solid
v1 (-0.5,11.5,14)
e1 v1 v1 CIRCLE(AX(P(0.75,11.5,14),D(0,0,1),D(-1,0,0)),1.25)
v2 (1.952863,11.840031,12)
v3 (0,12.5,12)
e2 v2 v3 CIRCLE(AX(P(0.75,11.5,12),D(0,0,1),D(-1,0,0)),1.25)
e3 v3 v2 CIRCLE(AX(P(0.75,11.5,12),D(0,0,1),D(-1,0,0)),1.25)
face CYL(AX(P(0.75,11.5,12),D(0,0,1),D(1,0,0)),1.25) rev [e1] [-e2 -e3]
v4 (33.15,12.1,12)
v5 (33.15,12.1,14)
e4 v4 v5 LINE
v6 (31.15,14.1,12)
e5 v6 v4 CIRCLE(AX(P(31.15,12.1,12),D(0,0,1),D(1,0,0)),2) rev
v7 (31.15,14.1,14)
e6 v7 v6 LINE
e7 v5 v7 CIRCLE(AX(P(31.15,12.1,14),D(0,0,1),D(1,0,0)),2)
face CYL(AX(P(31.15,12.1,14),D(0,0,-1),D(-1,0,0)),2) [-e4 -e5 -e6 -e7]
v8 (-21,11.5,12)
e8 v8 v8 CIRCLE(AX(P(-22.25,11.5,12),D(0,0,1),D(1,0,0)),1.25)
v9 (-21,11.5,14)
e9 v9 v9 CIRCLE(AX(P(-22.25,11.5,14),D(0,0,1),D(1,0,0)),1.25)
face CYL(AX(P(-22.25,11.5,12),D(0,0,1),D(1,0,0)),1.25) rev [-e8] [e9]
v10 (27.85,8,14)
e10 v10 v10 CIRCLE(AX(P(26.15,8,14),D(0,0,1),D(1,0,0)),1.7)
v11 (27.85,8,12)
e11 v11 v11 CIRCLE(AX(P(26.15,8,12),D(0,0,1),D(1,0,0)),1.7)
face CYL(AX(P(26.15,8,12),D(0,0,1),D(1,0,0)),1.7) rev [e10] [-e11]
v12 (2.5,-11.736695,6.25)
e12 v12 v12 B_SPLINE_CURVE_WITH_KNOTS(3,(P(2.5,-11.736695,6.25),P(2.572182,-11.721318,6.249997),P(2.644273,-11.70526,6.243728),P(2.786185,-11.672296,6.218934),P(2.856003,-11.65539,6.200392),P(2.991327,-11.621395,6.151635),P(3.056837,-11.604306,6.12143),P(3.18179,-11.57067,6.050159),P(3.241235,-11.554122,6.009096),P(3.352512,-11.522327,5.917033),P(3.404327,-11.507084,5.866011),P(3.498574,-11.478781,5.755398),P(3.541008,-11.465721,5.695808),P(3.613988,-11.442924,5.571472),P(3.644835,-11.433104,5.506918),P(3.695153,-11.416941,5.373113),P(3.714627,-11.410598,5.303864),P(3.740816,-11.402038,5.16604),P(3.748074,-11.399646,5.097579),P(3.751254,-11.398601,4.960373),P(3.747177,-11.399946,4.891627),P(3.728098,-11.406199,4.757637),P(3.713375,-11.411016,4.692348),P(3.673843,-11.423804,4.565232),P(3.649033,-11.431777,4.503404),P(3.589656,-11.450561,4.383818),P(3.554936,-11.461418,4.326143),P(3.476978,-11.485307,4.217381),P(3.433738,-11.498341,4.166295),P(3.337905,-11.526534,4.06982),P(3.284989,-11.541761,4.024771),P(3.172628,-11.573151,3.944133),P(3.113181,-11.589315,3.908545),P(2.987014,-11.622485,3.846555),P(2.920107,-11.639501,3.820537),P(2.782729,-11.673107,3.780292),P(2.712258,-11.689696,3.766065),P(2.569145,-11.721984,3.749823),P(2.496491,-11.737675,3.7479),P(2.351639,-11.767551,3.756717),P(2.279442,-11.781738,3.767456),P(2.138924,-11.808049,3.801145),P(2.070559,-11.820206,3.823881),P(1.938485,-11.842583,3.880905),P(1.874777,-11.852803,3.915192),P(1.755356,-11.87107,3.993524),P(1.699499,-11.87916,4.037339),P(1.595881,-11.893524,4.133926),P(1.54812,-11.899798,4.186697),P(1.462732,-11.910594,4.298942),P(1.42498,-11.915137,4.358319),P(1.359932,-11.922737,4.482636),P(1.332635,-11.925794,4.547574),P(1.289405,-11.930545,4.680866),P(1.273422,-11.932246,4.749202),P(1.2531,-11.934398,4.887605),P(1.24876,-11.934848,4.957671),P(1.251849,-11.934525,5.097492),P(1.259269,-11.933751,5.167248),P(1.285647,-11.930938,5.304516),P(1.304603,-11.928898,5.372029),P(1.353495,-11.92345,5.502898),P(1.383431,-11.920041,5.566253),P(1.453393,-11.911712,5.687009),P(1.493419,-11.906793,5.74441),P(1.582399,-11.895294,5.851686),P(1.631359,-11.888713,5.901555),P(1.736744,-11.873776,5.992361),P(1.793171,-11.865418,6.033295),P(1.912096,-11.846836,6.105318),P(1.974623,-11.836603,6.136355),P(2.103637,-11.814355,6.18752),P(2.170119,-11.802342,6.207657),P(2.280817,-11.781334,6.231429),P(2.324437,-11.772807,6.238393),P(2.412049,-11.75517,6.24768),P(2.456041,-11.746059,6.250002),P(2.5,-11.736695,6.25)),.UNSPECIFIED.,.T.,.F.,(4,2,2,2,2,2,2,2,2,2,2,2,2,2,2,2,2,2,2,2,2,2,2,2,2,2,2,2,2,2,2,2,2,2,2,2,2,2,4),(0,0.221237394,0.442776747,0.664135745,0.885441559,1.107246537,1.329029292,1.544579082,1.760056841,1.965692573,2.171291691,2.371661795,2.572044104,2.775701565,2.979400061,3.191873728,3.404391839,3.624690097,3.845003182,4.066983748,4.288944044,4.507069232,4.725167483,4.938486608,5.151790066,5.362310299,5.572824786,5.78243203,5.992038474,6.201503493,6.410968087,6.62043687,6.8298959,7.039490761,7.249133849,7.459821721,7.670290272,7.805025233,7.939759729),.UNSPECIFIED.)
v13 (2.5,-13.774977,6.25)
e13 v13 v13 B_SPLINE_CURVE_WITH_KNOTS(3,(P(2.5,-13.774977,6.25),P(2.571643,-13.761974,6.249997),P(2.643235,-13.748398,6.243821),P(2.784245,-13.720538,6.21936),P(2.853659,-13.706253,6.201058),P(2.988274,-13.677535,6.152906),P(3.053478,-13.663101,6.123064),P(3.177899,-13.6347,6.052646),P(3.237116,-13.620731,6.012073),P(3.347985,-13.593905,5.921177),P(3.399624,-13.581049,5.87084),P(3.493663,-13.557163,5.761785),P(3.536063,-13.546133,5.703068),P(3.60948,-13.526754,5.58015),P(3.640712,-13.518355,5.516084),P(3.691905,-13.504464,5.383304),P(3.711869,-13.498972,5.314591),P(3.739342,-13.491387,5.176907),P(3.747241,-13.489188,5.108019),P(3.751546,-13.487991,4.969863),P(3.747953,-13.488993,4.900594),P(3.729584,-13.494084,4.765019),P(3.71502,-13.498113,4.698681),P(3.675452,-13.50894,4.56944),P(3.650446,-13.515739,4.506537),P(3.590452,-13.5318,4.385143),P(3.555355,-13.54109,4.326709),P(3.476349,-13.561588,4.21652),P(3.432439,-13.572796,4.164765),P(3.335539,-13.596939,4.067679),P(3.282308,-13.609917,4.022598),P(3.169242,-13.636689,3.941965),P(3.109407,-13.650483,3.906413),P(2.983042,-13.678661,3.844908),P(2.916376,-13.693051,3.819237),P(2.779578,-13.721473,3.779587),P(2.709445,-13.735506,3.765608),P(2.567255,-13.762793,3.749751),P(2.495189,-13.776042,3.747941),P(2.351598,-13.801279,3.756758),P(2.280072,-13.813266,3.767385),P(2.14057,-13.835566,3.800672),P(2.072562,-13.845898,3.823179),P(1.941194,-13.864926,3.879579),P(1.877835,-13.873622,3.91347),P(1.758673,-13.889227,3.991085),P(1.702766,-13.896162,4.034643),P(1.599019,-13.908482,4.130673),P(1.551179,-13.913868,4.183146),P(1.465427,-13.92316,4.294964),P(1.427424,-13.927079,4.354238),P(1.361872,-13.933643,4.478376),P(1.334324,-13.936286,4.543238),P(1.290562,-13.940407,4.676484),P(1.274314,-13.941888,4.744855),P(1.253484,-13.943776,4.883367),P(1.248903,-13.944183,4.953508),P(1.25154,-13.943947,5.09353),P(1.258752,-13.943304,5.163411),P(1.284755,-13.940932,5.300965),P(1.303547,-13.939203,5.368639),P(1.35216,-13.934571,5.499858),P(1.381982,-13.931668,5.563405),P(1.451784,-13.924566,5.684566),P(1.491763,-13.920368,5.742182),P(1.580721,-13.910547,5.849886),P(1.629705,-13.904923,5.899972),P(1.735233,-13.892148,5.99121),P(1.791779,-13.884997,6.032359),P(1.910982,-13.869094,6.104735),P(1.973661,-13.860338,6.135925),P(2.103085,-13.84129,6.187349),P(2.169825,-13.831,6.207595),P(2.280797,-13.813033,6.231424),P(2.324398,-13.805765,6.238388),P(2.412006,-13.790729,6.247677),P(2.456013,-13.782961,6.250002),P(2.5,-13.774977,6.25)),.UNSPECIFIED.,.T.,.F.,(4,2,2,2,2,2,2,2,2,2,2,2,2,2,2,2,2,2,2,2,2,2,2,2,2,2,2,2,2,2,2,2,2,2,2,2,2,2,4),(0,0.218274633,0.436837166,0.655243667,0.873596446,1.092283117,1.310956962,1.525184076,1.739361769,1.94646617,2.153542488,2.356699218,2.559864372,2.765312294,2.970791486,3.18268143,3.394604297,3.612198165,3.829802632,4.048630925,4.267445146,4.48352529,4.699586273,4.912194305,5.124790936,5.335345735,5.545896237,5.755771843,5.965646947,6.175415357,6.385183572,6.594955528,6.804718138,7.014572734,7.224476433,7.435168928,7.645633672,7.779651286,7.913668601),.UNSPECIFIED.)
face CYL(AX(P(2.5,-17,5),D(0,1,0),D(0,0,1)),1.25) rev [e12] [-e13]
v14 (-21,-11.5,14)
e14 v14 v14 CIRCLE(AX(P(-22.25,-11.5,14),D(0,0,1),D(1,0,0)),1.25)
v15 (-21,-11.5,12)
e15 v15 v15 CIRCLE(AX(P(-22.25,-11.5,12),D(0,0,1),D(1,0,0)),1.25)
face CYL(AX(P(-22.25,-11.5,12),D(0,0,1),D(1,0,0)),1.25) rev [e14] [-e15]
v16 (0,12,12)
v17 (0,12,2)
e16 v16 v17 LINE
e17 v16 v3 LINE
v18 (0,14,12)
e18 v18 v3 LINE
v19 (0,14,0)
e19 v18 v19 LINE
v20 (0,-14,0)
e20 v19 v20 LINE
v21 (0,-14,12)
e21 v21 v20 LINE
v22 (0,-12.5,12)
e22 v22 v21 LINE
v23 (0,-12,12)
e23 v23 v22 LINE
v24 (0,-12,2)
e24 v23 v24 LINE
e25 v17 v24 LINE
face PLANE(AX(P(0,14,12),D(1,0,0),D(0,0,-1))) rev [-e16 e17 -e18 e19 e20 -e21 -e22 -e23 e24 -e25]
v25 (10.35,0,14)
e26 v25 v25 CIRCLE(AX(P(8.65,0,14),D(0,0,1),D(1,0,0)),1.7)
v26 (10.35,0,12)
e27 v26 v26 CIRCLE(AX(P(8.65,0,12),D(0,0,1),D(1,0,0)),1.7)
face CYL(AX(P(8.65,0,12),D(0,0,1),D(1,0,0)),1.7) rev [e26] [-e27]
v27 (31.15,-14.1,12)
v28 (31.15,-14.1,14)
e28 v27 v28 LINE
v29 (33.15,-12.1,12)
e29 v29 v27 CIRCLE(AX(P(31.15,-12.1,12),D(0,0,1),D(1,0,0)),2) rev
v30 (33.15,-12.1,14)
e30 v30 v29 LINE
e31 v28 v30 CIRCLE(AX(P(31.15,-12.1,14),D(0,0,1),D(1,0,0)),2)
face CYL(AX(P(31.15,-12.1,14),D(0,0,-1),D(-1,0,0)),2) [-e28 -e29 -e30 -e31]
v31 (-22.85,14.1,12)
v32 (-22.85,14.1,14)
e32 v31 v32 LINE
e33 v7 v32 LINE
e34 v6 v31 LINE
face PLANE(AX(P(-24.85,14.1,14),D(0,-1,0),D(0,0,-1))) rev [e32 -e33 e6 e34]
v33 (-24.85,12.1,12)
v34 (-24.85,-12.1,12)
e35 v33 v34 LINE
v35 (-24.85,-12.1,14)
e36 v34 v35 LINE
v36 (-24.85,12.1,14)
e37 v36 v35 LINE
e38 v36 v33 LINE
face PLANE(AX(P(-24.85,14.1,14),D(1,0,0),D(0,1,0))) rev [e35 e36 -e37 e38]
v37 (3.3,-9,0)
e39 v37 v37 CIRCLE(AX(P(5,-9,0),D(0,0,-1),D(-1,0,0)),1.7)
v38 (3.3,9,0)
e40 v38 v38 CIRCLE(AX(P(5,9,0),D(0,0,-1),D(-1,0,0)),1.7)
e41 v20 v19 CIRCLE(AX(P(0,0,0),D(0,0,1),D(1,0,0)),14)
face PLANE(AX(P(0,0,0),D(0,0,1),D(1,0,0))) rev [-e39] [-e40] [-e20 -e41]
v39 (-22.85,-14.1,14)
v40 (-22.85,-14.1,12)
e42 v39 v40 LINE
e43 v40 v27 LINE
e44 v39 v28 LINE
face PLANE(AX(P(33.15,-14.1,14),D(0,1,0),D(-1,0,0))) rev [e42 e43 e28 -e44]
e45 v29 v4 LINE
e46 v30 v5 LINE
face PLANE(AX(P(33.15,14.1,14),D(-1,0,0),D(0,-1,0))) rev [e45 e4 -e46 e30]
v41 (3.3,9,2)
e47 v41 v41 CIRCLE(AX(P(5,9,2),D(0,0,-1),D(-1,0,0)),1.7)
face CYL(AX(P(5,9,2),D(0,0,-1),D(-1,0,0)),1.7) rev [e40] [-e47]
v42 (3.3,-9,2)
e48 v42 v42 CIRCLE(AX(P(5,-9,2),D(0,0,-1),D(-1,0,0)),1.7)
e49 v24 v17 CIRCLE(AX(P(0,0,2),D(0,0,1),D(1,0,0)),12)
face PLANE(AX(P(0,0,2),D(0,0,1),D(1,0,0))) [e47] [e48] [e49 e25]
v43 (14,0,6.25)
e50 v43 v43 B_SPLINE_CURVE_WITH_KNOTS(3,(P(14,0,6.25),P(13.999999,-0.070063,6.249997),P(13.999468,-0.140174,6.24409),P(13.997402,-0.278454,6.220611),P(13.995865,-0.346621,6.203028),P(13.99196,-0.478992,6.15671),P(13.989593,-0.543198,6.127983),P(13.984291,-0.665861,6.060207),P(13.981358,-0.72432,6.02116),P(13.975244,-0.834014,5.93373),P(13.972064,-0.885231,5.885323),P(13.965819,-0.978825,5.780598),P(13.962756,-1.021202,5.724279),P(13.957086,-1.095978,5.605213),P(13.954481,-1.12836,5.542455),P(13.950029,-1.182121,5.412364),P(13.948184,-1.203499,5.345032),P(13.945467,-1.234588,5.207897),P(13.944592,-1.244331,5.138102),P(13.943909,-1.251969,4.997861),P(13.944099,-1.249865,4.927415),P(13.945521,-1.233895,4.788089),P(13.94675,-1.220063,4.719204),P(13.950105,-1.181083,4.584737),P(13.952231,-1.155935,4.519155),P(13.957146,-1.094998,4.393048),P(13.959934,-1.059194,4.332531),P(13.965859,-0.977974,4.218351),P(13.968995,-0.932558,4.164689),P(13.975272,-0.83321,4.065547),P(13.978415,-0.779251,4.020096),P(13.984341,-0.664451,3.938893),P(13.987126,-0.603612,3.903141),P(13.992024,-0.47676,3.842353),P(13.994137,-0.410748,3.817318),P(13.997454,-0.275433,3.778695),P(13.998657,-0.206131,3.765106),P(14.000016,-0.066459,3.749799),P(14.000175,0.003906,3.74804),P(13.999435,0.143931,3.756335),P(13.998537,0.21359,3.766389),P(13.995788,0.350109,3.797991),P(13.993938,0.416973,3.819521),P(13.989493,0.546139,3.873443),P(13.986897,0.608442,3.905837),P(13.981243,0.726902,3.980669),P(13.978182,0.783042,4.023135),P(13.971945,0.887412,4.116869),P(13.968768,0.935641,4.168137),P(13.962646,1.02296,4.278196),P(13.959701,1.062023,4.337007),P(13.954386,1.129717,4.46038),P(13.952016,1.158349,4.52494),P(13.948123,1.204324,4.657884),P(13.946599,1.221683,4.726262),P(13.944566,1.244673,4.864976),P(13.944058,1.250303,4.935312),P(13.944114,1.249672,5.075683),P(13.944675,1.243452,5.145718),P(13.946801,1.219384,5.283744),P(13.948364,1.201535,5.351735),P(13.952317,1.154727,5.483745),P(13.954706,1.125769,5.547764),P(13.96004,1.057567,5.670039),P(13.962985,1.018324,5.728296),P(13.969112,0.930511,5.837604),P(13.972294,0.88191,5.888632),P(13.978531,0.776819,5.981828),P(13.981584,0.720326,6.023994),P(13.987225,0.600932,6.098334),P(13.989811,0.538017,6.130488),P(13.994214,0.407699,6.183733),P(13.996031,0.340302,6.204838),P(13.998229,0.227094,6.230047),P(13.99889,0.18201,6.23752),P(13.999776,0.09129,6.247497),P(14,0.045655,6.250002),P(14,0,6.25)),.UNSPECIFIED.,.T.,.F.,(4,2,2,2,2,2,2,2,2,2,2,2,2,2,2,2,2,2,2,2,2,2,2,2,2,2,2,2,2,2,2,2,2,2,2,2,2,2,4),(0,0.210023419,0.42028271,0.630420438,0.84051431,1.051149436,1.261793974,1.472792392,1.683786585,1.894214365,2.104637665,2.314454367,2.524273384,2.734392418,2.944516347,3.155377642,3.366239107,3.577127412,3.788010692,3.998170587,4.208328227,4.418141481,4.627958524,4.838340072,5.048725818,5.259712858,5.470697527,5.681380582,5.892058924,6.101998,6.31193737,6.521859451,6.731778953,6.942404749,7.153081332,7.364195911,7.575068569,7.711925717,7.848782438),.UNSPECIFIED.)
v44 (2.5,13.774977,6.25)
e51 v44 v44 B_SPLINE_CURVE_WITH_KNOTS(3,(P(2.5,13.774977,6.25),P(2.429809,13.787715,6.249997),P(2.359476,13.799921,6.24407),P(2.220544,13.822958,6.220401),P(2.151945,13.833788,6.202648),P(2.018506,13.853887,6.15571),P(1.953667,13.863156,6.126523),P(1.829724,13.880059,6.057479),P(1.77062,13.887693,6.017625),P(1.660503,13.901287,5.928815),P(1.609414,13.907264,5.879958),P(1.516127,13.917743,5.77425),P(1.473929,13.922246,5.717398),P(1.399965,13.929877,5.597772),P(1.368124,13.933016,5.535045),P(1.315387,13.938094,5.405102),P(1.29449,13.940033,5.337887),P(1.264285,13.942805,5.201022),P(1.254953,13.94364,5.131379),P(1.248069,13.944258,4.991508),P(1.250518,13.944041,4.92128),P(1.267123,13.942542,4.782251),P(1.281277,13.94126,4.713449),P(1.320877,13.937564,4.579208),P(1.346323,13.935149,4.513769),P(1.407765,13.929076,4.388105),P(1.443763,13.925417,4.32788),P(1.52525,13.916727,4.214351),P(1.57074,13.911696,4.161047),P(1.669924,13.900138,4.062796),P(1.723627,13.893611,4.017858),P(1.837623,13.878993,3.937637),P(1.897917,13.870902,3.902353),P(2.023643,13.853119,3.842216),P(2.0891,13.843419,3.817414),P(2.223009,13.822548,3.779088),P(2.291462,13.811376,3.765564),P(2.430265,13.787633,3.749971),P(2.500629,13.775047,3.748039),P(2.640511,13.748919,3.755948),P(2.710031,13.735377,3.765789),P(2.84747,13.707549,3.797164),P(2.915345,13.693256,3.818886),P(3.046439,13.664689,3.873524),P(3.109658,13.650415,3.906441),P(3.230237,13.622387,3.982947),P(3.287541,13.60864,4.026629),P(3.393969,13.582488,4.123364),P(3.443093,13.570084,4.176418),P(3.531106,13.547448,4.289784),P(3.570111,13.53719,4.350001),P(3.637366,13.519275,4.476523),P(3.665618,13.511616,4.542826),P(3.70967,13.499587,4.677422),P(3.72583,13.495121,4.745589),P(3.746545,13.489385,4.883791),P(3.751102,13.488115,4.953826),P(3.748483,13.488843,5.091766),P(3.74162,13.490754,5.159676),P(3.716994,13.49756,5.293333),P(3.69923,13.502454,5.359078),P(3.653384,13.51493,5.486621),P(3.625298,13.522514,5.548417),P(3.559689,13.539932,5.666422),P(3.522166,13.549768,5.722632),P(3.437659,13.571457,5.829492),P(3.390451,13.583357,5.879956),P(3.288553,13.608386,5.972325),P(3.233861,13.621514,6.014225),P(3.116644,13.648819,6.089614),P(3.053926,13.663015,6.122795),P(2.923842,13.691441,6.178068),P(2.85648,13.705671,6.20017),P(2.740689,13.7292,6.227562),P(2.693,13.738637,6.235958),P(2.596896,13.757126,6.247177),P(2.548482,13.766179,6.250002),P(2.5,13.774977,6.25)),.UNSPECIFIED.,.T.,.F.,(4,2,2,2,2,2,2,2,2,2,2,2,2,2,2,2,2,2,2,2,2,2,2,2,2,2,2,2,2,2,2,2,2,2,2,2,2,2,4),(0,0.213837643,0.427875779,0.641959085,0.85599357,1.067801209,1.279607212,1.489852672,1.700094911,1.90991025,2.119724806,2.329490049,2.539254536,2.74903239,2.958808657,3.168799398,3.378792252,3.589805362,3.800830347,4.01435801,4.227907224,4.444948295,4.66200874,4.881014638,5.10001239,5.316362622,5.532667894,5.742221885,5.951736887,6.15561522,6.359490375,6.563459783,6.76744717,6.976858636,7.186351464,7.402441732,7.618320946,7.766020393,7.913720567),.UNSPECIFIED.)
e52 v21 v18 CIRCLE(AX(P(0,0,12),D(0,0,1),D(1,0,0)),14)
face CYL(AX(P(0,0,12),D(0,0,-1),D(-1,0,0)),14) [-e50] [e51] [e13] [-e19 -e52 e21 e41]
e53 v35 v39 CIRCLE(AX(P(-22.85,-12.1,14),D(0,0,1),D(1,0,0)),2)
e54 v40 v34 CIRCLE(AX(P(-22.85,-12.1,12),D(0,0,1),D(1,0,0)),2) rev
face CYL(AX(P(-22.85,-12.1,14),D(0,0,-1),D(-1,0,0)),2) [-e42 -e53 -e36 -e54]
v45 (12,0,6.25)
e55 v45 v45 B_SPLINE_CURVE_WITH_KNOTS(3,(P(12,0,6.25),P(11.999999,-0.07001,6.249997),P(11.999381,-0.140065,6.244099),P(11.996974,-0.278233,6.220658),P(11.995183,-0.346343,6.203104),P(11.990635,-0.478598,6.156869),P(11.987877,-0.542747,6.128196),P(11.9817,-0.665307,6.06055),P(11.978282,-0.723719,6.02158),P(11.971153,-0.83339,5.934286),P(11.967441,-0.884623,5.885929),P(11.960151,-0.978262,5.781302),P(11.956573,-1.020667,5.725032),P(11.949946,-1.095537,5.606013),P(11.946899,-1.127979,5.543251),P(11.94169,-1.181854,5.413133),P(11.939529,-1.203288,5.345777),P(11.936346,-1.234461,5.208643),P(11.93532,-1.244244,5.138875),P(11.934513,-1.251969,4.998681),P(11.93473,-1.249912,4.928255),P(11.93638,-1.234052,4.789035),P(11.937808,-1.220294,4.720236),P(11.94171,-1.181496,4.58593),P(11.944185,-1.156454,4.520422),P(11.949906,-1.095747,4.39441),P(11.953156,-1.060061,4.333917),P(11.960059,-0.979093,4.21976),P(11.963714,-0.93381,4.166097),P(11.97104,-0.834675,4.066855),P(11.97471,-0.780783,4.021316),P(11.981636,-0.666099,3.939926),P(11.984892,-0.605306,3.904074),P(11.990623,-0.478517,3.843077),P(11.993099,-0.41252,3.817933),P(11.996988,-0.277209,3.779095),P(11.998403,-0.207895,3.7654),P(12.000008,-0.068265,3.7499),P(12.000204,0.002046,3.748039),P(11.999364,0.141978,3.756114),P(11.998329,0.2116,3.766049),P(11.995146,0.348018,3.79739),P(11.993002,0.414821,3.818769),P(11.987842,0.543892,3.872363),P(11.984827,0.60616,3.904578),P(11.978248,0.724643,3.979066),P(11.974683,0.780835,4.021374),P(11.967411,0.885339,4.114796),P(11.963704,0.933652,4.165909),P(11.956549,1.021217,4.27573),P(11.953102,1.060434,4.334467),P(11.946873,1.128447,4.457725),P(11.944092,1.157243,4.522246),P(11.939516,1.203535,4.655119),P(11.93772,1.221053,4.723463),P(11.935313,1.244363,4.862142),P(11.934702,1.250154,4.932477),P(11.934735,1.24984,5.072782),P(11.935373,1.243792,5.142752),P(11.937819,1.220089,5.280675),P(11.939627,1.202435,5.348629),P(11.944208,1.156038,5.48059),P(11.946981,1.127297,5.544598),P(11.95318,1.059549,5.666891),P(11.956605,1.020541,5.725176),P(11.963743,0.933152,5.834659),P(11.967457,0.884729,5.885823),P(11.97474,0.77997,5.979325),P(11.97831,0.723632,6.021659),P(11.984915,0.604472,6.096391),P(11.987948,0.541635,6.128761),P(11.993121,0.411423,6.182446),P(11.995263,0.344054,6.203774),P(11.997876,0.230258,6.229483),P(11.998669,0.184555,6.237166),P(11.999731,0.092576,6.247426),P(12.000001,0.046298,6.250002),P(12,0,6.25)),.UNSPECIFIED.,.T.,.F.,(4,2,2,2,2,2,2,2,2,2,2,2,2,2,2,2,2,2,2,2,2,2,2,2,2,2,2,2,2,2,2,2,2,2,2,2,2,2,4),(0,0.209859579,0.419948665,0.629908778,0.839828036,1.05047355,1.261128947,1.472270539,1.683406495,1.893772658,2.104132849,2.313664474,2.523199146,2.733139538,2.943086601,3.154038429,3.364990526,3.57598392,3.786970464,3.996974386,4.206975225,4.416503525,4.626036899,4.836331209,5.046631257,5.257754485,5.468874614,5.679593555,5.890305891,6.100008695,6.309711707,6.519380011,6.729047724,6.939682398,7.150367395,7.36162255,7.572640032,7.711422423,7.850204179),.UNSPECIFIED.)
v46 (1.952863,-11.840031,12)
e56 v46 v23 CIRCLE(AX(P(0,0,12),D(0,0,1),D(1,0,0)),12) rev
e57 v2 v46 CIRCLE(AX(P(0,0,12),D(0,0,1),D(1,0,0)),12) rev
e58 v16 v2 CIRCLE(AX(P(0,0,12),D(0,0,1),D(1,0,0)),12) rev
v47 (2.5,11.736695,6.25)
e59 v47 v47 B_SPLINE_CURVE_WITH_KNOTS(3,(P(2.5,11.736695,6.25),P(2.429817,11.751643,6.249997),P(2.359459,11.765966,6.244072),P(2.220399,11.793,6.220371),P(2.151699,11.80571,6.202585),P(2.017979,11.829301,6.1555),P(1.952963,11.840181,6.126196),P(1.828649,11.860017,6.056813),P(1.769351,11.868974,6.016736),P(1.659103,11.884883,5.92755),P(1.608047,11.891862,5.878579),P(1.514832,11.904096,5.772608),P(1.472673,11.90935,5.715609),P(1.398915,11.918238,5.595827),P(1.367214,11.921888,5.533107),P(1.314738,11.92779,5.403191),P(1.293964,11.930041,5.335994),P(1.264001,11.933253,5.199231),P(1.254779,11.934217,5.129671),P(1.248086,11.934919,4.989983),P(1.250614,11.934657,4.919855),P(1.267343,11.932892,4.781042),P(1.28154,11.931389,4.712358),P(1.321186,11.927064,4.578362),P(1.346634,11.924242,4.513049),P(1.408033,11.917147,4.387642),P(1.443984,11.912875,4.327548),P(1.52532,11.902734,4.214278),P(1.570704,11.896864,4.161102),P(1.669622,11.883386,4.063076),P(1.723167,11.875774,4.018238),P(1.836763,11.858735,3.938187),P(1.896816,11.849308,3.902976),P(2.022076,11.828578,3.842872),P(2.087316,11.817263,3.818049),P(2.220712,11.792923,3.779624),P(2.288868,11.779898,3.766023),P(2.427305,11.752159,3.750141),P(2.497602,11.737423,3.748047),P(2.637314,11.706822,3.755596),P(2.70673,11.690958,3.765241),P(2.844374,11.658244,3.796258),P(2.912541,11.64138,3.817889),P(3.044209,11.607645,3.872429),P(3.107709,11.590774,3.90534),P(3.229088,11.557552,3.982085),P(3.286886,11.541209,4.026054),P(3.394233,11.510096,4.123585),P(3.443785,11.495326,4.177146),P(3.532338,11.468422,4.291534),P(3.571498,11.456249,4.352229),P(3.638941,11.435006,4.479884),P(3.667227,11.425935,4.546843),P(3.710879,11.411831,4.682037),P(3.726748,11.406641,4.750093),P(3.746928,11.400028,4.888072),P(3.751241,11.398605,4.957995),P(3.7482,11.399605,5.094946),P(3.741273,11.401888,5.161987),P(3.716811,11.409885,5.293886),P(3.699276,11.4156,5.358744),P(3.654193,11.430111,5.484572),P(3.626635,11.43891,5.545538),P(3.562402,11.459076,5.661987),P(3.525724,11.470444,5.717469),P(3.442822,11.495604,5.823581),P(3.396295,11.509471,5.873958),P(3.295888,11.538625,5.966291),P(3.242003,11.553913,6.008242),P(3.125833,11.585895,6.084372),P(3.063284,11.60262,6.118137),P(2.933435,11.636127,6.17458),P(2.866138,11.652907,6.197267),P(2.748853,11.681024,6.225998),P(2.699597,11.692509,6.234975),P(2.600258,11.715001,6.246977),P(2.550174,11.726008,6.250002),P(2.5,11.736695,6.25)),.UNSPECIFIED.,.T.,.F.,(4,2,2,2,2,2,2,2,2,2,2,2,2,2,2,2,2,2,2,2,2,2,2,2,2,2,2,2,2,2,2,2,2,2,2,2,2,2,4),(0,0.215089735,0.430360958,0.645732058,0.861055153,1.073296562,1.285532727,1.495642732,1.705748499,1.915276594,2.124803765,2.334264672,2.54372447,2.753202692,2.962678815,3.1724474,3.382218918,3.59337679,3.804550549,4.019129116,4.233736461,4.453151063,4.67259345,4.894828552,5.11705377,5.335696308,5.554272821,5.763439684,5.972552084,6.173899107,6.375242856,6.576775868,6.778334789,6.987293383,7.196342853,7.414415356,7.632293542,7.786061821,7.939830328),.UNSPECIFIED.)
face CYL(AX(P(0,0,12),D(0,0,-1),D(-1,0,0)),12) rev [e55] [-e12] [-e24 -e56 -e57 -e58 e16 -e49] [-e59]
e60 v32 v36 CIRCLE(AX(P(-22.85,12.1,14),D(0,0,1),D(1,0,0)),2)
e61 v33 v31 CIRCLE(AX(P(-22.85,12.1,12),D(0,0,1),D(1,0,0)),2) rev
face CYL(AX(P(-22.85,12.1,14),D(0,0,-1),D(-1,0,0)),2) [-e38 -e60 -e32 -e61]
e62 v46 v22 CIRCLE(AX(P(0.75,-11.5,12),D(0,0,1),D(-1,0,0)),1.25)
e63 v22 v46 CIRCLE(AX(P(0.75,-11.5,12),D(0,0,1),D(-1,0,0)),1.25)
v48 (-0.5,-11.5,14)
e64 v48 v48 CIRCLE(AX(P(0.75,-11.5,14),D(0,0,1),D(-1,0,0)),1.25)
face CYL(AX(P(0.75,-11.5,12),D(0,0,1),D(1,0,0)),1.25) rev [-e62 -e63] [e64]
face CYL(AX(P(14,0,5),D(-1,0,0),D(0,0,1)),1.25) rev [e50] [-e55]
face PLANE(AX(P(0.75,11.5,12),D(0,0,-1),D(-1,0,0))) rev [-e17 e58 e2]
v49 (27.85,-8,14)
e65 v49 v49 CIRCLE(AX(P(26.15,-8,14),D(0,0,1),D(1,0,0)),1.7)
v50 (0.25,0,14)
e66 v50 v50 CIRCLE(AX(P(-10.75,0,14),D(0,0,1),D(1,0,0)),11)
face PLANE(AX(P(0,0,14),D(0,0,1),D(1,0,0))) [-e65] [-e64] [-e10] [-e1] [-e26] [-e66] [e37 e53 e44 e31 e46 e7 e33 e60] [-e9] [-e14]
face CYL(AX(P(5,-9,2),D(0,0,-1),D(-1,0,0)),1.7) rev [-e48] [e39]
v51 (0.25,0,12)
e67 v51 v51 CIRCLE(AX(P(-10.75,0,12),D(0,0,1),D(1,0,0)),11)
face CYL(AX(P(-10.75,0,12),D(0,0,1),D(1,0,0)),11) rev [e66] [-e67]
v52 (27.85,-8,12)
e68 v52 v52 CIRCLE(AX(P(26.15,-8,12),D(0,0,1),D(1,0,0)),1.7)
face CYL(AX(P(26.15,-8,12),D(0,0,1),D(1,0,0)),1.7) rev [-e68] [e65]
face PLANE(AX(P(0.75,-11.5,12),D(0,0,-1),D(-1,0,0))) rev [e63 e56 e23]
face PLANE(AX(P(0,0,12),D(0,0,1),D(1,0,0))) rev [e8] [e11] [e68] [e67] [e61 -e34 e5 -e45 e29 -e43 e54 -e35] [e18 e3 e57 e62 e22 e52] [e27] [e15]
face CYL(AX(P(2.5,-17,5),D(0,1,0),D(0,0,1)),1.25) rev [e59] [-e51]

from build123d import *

# Parameters (mm, degrees)
BOSS_EXTRUDE1_DEPTH = 12
SKETCH2_W           = 58
SKETCH2_H           = 28.2
BOSS_EXTRUDE2_DEPTH = 2
SHELL2_START        = 2
SHELL2_DEPTH        = 10
SKETCH3_R           = 11
SKETCH3_R_2         = 1.25
CUT_EXTRUDE1_DEPTH  = 2
FILLET1_R           = 2
SKETCH4_R           = 1.7
CUT_EXTRUDE2_DEPTH  = 2
SKETCH5_R           = 1.7
CUT_EXTRUDE3_DEPTH  = 2
SKETCH7_R           = 1.25
CUT_EXTRUDE6_DEPTH  = 14
SKETCH8_R           = 1.25
CUT_EXTRUDE7_DEPTH  = 17


# Read off the part's stored shape, not the designer's step: Shell2
with BuildPart() as part:
    # Sketch1 → Boss-Extrude1 (new body)
    with BuildSketch(Plane.XY):
        with BuildLine():
            Line((0, 14), (0, -14))
            ThreePointArc((0, -14), (14, 0), (0, 14))
        make_face()
    extrude(amount=BOSS_EXTRUDE1_DEPTH)

    # Sketch2 → Boss-Extrude2 (add)
    with BuildSketch(Plane.XY.offset(12)):
        with Locations((4.15, 0)):
            Rectangle(SKETCH2_W, SKETCH2_H)
    extrude(amount=BOSS_EXTRUDE2_DEPTH)

    # Shell2 outline → Shell2 (cut)
    with BuildSketch(Plane.XY.offset(SHELL2_START)):
        with BuildLine():
            ThreePointArc((0, -12), (12, 0), (0, 12))
            Line((0, 12), (0, -12))
        make_face()
    extrude(amount=SHELL2_DEPTH, mode=Mode.SUBTRACT)

    # Sketch3 → Cut-Extrude1 (cut)
    with BuildSketch(Plane.XY.offset(14)):
        with Locations((-10.75, 0)):
            Circle(SKETCH3_R)
        with Locations((-22.25, 11.5)):
            Circle(SKETCH3_R_2)
        with Locations((-22.25, -11.5)):
            Circle(SKETCH3_R_2)
        with Locations(Location((0.75, -11.5, 0), (0, 0, 344.215225354))):
            Circle(SKETCH3_R_2)
        with Locations(Location((0.75, 11.5, 0), (0, 0, 15.784774646))):
            Circle(SKETCH3_R_2)
    extrude(amount=-CUT_EXTRUDE1_DEPTH, mode=Mode.SUBTRACT)

    # Fillet1
    fillet1_edges = [part.edges().sort_by_distance(p)[0] for p in [
        (-24.85, 14.1, 13),
        (-24.85, -14.1, 13),
        (33.15, -14.1, 13),
        (33.15, 14.1, 13),
    ]]
    fillet(fillet1_edges, radius=FILLET1_R)

    # Sketch4 → Cut-Extrude2 (cut)
    with BuildSketch(Plane.XY.offset(14)):
        with Locations((26.15, 8)):
            Circle(SKETCH4_R)
        with Locations((26.15, -8)):
            Circle(SKETCH4_R)
        with Locations((8.65, 0)):
            Circle(SKETCH4_R)
    extrude(amount=-CUT_EXTRUDE2_DEPTH, mode=Mode.SUBTRACT)

    # Sketch5 → Cut-Extrude3 (cut)
    with BuildSketch(Plane(origin=(0, 0, 0), x_dir=(-1, 0, 0), z_dir=(0, 0, -1))):
        with Locations((-5, -9)):
            Circle(SKETCH5_R)
        with Locations((-5, 9)):
            Circle(SKETCH5_R)
    extrude(amount=-CUT_EXTRUDE3_DEPTH, mode=Mode.SUBTRACT)

    # Sketch7 → Cut-Extrude6 (cut)
    with BuildSketch(Plane(origin=(0, 0, 0), x_dir=(0, 0, -1), z_dir=(1, 0, 0))):
        with Locations(Location((-5, 0, 0), (0, 0, 180))):
            Circle(SKETCH7_R)
    extrude(amount=CUT_EXTRUDE6_DEPTH, mode=Mode.SUBTRACT)

    # Sketch8 → Cut-Extrude7 (cut, symmetric)
    with BuildSketch(Plane(origin=(0, 0, 0), x_dir=(1, 0, 0), z_dir=(0, 1, 0))):
        with Locations(Location((2.5, -5, 0), (0, 0, 270))):
            Circle(SKETCH8_R)
    extrude(amount=CUT_EXTRUDE7_DEPTH, both=True, mode=Mode.SUBTRACT)


solid = part.part
